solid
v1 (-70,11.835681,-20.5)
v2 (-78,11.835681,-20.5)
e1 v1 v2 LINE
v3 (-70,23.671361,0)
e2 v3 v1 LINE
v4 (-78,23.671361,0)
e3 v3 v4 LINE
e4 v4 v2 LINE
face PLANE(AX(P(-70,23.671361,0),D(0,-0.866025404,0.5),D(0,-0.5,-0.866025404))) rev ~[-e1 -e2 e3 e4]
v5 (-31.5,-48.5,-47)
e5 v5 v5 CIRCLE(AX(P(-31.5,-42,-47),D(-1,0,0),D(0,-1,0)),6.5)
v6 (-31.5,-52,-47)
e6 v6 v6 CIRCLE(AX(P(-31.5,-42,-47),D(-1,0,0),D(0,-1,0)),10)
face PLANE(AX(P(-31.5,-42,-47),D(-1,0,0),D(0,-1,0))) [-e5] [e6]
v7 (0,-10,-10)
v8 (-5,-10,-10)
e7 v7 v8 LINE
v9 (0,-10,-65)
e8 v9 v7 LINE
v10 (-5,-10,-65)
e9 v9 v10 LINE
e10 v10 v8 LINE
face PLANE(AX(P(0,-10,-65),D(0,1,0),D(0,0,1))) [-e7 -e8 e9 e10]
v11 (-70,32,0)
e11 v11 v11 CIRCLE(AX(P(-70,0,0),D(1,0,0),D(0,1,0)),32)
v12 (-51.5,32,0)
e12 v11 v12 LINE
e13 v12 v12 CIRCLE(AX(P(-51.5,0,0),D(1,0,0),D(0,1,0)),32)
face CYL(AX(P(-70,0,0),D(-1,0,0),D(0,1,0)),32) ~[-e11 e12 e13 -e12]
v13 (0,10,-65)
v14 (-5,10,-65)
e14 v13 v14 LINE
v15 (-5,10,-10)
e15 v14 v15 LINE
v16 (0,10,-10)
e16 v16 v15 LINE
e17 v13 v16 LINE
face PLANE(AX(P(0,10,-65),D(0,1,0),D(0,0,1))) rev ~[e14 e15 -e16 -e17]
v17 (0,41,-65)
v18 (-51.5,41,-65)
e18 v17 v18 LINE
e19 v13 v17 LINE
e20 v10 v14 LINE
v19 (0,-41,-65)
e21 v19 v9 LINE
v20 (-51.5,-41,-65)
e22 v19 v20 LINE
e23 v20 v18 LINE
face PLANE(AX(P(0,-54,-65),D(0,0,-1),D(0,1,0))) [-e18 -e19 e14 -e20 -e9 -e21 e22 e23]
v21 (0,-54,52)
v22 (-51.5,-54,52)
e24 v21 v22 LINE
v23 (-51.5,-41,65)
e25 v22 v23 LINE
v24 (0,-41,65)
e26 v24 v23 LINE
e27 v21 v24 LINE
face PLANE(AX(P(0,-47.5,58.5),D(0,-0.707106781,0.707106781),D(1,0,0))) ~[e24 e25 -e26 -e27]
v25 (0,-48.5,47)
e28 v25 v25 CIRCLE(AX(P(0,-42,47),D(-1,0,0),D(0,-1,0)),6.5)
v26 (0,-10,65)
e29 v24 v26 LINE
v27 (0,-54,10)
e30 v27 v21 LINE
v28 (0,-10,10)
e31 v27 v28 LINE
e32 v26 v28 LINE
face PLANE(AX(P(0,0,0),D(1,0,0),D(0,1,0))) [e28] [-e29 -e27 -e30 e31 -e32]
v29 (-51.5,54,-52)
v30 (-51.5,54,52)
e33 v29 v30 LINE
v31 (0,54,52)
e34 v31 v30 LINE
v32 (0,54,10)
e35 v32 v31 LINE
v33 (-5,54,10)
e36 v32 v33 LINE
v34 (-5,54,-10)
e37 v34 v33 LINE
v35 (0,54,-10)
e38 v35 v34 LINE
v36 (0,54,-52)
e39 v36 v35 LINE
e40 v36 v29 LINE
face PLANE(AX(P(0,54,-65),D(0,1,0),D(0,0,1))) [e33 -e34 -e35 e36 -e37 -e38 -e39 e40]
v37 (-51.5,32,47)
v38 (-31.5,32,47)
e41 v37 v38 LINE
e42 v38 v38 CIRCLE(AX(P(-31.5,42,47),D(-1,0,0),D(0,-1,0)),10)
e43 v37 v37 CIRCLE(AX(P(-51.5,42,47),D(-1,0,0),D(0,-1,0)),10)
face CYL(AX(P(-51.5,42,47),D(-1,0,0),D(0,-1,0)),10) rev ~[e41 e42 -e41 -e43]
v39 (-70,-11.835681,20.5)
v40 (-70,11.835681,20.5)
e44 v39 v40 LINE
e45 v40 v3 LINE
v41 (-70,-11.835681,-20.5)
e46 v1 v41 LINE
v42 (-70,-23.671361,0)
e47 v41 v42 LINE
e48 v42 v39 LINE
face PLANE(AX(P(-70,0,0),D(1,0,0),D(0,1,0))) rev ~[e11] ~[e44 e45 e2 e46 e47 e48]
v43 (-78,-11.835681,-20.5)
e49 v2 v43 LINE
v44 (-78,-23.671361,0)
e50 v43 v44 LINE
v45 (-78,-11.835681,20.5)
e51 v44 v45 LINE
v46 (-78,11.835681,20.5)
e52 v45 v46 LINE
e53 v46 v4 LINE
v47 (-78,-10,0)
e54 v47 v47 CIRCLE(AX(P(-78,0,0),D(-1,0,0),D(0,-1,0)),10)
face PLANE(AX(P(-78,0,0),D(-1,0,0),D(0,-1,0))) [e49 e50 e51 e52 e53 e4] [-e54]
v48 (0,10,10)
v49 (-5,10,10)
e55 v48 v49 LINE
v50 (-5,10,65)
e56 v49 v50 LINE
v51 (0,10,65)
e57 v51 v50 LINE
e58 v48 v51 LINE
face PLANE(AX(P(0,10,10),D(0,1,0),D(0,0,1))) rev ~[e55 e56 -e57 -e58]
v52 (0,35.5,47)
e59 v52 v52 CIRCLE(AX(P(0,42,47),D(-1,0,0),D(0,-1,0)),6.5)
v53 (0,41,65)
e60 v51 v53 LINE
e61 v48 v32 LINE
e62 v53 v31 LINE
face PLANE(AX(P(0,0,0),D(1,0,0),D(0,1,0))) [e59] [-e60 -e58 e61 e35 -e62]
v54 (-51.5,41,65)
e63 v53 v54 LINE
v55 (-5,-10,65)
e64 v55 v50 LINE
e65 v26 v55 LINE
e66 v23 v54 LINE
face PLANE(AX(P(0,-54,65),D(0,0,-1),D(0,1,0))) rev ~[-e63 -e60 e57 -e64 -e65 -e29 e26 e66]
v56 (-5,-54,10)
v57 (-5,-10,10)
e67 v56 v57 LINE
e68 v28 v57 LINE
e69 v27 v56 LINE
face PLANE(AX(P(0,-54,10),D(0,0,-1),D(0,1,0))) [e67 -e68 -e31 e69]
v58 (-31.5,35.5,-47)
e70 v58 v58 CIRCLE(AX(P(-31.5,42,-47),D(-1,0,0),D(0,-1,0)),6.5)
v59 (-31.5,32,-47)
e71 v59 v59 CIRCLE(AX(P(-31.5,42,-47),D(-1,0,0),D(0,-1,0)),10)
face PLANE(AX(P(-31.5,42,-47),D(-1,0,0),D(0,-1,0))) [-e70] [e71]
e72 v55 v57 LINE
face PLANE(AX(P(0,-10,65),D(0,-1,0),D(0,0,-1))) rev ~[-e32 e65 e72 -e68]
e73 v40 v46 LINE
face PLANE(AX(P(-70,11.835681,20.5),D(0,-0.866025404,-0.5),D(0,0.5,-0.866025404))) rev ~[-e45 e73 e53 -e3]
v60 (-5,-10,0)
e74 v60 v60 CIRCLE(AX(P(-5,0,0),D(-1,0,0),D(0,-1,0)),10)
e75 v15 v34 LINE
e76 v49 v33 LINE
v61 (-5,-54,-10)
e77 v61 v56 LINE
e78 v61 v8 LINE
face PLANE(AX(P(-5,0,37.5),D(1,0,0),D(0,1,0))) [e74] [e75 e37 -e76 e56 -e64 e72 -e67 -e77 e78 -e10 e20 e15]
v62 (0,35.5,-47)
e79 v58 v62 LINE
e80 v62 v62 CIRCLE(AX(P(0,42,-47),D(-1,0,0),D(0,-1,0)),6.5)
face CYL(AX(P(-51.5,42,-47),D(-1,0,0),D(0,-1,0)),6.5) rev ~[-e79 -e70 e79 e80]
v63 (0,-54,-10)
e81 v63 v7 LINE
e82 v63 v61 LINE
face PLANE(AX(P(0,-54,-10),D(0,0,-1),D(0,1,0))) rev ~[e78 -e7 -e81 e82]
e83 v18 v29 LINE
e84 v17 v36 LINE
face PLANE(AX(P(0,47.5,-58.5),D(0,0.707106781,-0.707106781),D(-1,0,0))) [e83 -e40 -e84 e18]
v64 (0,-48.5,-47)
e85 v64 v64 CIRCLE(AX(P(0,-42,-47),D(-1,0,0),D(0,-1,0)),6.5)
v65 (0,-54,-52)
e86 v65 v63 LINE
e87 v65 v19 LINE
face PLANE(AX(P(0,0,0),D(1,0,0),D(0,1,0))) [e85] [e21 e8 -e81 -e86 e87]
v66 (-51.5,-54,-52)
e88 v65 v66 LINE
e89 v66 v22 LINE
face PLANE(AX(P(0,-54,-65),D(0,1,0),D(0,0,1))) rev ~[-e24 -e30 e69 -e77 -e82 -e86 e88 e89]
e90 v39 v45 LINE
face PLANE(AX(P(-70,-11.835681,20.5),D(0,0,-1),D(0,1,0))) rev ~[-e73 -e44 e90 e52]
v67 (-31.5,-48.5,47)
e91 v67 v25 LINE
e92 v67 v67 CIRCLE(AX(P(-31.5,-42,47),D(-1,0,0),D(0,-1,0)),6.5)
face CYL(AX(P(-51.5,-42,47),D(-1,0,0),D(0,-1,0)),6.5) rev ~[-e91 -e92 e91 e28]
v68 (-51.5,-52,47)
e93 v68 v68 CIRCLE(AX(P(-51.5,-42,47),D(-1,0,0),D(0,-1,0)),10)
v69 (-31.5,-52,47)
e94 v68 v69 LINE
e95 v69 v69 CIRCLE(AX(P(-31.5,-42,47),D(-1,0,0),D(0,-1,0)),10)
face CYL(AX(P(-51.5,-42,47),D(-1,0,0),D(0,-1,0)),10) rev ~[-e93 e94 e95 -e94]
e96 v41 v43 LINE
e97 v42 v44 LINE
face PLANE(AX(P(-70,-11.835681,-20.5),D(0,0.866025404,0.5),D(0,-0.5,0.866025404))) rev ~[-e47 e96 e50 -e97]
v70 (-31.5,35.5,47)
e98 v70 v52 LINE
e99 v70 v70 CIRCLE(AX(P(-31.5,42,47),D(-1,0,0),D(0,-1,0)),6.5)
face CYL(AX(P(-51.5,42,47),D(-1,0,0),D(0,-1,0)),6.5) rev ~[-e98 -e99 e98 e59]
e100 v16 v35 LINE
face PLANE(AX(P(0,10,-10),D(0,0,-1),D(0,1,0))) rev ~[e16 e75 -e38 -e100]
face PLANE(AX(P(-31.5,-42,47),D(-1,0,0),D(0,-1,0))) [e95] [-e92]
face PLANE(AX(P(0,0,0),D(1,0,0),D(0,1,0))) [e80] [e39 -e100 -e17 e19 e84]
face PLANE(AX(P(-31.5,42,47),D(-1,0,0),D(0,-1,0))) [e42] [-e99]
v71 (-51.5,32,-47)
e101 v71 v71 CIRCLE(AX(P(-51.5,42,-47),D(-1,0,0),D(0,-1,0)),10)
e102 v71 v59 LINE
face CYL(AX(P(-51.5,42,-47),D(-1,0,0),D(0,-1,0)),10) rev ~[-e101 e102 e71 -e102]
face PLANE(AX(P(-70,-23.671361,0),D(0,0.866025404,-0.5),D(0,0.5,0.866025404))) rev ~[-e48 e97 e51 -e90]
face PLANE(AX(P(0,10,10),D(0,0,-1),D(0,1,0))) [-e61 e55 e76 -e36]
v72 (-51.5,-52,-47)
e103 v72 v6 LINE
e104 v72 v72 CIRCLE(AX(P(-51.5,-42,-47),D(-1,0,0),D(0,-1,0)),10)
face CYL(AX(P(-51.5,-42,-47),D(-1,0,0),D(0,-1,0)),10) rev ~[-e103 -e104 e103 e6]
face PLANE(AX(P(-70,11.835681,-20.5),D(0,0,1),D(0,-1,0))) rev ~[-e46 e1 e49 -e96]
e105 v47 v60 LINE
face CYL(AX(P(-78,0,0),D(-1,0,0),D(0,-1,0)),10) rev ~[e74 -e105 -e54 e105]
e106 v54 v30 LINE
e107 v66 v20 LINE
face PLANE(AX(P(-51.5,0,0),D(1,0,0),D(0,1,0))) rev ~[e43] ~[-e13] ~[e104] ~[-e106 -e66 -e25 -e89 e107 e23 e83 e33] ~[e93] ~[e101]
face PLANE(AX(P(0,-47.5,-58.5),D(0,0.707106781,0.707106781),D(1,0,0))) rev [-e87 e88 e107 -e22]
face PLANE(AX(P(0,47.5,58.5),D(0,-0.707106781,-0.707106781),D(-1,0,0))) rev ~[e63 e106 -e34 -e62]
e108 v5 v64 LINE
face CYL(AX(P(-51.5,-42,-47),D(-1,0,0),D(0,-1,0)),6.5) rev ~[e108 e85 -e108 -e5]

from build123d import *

# Parameters (mm, degrees)
F0_W      = 108
F0_H      = 130
F1_DEPTH  = 51.5
F2_R      = 6.5
F3_DEPTH  = 51.501
F4_R      = 10
F5_DEPTH  = 20
F7_R      = 32
F8_DEPTH  = 18.5
F10_DEPTH = 8
F11_R     = 10
F12_DEPTH = 78.001
F13_SIZE  = 13
F14_W     = 20
F14_H     = 55
F14_H_2   = 20
F14_W_2   = 44
F15_DEPTH = 5


with BuildPart() as f1:
    # F0 (on Right) → F1 (new body)
    with BuildSketch(Plane.YZ):
        Rectangle(F0_W, F0_H)
    extrude(amount=-F1_DEPTH)

    # F2 (on face) → F3 (cut, through all)
    with BuildSketch(Plane(origin=(-51.5, 0, 0), x_dir=(0, -1, 0), z_dir=(-1, 0, 0))):
        with Locations((42, 47)):
            Circle(F2_R)
        with Locations((-42, 47)):
            Circle(F2_R)
        with Locations((-42, -47)):
            Circle(F2_R)
        with Locations((42, -47)):
            Circle(F2_R)
    extrude(amount=-F3_DEPTH, mode=Mode.SUBTRACT)

    # F4 (on face) → F5 (cut)
    with BuildSketch(Plane(origin=(-51.5, 0, 0), x_dir=(0, -1, 0), z_dir=(-1, 0, 0))):
        with Locations((-42, 47)):
            Circle(F4_R)
        with Locations((-42, -47)):
            Circle(F4_R)
        with Locations((42, 47)):
            Circle(F4_R)
        with Locations((42, -47)):
            Circle(F4_R)
    extrude(amount=-F5_DEPTH, mode=Mode.SUBTRACT)

    # F7 (on offset) → F8 (join, through all)
    with BuildSketch(Plane.YZ.offset(-70)):
        Circle(F7_R)
    extrude(amount=F8_DEPTH)

    # F9 (on face) → F10 (join)
    with BuildSketch(Plane(origin=(-70, 0, 0), x_dir=(0, -1, 0), z_dir=(-1, 0, 0))):
        Polygon((23.6713610368, 0), (11.8356805184, 20.5), (-11.8356805184, 20.5), (-23.6713610368, 0), (-11.8356805184, -20.5), (11.8356805184, -20.5), align=None)
    extrude(amount=F10_DEPTH)

    # F11 (on face) → F12 (cut, through all)
    with BuildSketch(Plane(origin=(-78, 0, 0), x_dir=(0, -1, 0), z_dir=(-1, 0, 0))):
        Circle(F11_R)
    extrude(amount=-F12_DEPTH, mode=Mode.SUBTRACT)

    # F13
    f13_edges = [f1.edges().sort_by_distance(p)[0] for p in [
        (-25.75, -54, 65),
        (-25.75, 54, 65),
        (-25.75, -54, -65),
        (-25.75, 54, -65),
    ]]
    chamfer(f13_edges, length=F13_SIZE)

    # F14 (on face) → F15 (cut)
    with BuildSketch(Plane.YZ):
        with Locations((0, 37.5)):
            Rectangle(F14_W, F14_H)
        Rectangle(F14_W, F14_H_2)
        with Locations((-32, 0)):
            Rectangle(F14_W_2, F14_H_2)
        with Locations((32, 0)):
            Rectangle(F14_W_2, F14_H_2)
        with Locations((0, -37.5)):
            Rectangle(F14_W, F14_H)
    extrude(amount=-F15_DEPTH, mode=Mode.SUBTRACT)


solid = f1.part
